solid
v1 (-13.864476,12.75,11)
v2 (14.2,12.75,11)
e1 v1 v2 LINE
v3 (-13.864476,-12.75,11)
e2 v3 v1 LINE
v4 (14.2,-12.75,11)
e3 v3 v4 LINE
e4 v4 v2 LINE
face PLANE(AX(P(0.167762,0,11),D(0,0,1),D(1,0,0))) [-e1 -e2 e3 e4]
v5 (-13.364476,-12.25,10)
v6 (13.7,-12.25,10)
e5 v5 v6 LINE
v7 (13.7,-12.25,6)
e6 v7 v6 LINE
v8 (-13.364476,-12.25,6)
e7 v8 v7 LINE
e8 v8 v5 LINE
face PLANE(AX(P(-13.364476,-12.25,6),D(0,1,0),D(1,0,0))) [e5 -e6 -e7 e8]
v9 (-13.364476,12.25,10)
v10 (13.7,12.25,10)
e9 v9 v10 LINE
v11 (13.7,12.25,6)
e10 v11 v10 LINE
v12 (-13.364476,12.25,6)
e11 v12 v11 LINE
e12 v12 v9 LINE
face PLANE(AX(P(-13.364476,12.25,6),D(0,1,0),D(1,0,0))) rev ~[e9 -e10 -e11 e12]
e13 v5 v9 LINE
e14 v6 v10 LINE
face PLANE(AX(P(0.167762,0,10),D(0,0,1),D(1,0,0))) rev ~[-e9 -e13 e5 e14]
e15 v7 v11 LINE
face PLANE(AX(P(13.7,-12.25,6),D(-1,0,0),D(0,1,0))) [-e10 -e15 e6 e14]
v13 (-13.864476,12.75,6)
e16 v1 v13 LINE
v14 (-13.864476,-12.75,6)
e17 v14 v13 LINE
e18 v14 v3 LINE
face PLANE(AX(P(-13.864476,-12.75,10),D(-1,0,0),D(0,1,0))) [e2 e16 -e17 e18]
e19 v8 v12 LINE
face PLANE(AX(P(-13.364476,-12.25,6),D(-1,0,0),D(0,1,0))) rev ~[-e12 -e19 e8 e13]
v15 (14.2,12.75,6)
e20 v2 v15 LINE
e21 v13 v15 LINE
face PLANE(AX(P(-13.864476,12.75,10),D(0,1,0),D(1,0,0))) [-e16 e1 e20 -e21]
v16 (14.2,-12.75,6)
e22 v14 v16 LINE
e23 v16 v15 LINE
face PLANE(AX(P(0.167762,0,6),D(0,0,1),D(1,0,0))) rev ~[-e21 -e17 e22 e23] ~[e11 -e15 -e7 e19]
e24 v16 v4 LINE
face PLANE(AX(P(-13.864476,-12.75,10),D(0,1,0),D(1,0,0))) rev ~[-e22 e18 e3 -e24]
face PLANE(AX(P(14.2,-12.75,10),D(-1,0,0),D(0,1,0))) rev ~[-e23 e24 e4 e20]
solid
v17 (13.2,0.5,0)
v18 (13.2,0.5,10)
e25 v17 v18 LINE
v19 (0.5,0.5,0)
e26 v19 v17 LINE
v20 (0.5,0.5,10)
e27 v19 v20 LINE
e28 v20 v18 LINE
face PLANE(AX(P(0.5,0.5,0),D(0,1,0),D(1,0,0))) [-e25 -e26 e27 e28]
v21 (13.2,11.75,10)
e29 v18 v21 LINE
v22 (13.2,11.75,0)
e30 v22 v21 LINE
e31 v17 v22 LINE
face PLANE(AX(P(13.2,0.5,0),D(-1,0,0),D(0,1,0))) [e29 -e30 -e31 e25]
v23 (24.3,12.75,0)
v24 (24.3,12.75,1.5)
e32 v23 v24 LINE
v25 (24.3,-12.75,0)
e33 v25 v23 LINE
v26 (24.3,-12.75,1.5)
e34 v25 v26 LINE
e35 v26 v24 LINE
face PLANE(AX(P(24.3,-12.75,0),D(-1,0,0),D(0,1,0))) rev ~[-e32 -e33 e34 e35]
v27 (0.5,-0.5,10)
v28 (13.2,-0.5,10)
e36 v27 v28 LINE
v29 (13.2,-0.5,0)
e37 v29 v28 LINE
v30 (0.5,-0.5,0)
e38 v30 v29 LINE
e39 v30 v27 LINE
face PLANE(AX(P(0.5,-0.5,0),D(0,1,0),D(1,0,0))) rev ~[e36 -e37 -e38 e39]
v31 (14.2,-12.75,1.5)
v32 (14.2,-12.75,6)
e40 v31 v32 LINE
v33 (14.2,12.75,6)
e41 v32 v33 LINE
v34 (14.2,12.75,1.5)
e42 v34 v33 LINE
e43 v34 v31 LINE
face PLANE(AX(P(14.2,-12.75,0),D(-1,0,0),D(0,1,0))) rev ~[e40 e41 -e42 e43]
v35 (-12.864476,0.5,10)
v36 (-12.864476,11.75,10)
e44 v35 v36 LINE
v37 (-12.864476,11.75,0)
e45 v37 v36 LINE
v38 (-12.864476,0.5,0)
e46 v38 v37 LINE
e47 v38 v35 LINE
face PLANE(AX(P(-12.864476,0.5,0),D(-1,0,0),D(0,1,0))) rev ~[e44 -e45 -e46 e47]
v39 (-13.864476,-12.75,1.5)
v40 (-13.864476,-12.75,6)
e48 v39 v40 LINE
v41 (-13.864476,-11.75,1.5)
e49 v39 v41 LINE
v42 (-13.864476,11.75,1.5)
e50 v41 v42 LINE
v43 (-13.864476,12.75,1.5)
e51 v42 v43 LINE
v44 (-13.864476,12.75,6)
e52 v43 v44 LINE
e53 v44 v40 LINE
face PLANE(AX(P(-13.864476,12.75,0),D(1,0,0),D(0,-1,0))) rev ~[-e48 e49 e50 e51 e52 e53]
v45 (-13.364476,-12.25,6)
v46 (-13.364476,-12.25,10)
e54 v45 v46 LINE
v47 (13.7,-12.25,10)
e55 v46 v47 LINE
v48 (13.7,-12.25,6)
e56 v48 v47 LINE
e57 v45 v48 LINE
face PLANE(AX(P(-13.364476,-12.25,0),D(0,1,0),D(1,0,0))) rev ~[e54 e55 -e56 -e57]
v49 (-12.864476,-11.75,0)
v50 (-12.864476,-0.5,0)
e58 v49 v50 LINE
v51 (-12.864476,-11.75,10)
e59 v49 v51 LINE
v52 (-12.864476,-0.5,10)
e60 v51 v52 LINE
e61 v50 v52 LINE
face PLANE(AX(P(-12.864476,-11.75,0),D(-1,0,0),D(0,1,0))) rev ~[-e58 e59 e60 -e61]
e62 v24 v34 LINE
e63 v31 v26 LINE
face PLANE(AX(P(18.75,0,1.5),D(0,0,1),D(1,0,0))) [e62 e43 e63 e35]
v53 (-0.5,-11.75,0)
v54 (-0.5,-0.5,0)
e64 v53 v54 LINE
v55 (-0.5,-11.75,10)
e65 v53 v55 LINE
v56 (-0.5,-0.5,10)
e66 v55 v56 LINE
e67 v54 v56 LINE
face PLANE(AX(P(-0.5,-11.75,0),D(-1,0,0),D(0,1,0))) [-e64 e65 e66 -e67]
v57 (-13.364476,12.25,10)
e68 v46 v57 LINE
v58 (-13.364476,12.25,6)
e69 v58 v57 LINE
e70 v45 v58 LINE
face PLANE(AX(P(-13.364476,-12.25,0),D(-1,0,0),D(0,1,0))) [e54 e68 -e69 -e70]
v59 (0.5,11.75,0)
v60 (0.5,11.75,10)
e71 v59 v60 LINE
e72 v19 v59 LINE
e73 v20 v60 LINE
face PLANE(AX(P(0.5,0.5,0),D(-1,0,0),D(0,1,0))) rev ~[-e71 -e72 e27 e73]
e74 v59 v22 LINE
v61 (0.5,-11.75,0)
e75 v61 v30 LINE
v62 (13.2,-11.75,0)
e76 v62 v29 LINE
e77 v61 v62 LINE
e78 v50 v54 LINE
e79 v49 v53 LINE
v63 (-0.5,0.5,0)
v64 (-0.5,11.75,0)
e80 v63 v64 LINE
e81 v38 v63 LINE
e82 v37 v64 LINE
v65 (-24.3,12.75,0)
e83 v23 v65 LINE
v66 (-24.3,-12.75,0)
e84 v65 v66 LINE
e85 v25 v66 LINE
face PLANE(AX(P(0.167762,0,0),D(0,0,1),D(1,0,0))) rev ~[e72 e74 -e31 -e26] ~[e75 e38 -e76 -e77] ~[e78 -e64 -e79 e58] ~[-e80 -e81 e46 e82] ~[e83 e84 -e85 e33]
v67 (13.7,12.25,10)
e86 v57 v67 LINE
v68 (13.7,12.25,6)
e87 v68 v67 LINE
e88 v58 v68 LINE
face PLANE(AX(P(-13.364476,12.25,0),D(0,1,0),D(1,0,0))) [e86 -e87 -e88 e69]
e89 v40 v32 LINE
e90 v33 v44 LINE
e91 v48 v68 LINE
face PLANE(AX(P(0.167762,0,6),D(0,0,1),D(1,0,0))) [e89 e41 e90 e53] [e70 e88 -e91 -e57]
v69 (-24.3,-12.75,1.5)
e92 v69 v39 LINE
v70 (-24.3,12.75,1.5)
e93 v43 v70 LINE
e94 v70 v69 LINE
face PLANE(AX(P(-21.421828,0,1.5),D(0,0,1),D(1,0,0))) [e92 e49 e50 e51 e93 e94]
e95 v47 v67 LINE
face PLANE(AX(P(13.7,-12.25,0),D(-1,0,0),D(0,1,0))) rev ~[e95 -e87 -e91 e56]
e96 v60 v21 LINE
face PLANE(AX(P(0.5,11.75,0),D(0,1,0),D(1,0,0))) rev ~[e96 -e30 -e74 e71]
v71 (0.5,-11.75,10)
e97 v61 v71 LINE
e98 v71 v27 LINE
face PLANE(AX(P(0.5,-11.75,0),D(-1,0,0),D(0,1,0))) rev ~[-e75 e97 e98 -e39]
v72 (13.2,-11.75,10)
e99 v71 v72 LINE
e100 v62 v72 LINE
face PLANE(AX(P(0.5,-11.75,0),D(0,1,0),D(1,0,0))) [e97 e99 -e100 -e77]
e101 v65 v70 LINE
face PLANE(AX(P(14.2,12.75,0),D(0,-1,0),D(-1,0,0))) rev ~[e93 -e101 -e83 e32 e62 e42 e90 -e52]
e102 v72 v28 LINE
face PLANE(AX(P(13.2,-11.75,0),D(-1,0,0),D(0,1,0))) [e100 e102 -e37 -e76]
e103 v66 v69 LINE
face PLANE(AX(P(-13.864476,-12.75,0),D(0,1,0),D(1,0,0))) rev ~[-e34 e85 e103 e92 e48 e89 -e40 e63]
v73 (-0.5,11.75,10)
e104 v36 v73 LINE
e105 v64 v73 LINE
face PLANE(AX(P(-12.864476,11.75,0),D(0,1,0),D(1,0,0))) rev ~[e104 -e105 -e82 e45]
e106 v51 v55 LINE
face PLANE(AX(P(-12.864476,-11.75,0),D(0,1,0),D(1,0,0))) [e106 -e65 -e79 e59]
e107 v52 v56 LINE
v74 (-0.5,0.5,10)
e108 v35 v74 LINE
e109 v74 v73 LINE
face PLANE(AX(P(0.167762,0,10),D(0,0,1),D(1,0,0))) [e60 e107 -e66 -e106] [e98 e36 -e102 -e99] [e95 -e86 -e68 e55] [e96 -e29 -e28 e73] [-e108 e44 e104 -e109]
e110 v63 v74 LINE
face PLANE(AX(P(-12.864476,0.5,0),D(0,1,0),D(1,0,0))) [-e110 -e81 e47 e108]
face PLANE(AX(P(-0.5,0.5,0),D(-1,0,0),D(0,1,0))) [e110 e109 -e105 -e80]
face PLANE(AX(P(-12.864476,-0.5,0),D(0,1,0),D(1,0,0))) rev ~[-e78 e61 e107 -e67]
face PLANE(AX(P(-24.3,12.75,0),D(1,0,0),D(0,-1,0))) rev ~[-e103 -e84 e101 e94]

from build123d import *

# Parameters (mm, degrees)
F0_W     = 9.1
F0_H     = 23.5
F1_DEPTH = 1.5
F0_W_2   = 9.4355237663
F0_W_3   = 27.0644762337
F0_H_2   = 24.5
F2_DEPTH = 6
F0_W_4   = 12.3644762337
F0_H_3   = 11.25
F0_W_5   = 12.7
F3_DEPTH = 10
F4_W     = 28.0644762337
F4_H     = 25.5
F4_W_2   = 27.0644762337
F4_H_2   = 24.5
F5_DEPTH = 4
F6_W     = 28.0644762337
F6_H     = 25.5
F7_DEPTH = 1


with BuildPart() as f1:
    # F0 (on Top) → F1 (new body)
    with BuildSketch(Plane.XY):
        with Locations((18.75, 0)):
            Rectangle(F0_W, F0_H)
        Polygon((24.3, -12.75), (24.3, 12.75), (14.2, 12.75), (14.2, 11.75), (23.3, 11.75), (23.3, -11.75), (14.2, -11.75), (14.2, -12.75), align=None)
    extrude(amount=F1_DEPTH)



with BuildPart() as f1b:
    # F0 (on Top) → F1, piece 2 (new body)
    with BuildSketch(Plane.XY):
        Polygon((-13.8644762337, 11.75), (-13.8644762337, 12.75), (-24.3, 12.75), (-24.3, -12.75), (-13.8644762337, -12.75), (-13.8644762337, -11.75), (-23.3, -11.75), (-23.3, 11.75), align=None)
        with Locations((-18.5822381169, 0)):
            Rectangle(F0_W_2, F0_H)
    extrude(amount=F1_DEPTH)


with BuildPart() as f1_1:
    add(f1.part)

    add(f1b.part)  # F2 merges F1b
    # F0 (on Top) → F2 (join)
    with BuildSketch(Plane.XY):
        Polygon((14.2, 11.75), (14.2, 12.75), (-13.8644762337, 12.75), (-13.8644762337, 11.75), (-13.8644762337, -11.75), (-13.8644762337, -12.75), (14.2, -12.75), (14.2, -11.75), align=None)
        with Locations((0.1677618831, 0)):
            Rectangle(F0_W_3, F0_H_2, mode=Mode.SUBTRACT)
    extrude(amount=F2_DEPTH)

    # F0 (on Top) → F3 (join)
    with BuildSketch(Plane.XY):
        with Locations((0.1677618831, 0)):
            Rectangle(F0_W_3, F0_H_2)
        with Locations((-6.6822381169, -6.125)):
            Rectangle(F0_W_4, F0_H_3, mode=Mode.SUBTRACT)
        with Locations((6.85, -6.125)):
            Rectangle(F0_W_5, F0_H_3, mode=Mode.SUBTRACT)
        with Locations((-6.6822381169, 6.125)):
            Rectangle(F0_W_4, F0_H_3, mode=Mode.SUBTRACT)
        with Locations((6.85, 6.125)):
            Rectangle(F0_W_5, F0_H_3, mode=Mode.SUBTRACT)
    extrude(amount=F3_DEPTH)


with BuildPart() as f5:
    # F4 (on face) → F5 (new body)
    with BuildSketch(Plane.XY.offset(6)):
        with Locations((0.1677618831, 0)):
            Rectangle(F4_W, F4_H)
        with Locations((0.1677618831, 0)):
            Rectangle(F4_W_2, F4_H_2, mode=Mode.SUBTRACT)
    extrude(amount=F5_DEPTH)

    # F6 (on face) → F7 (join)
    with BuildSketch(Plane.XY.offset(10)):
        with Locations((0.1677618831, 0)):
            Rectangle(F6_W, F6_H)
    extrude(amount=F7_DEPTH)


solid = Compound([f1_1.part, f5.part])
